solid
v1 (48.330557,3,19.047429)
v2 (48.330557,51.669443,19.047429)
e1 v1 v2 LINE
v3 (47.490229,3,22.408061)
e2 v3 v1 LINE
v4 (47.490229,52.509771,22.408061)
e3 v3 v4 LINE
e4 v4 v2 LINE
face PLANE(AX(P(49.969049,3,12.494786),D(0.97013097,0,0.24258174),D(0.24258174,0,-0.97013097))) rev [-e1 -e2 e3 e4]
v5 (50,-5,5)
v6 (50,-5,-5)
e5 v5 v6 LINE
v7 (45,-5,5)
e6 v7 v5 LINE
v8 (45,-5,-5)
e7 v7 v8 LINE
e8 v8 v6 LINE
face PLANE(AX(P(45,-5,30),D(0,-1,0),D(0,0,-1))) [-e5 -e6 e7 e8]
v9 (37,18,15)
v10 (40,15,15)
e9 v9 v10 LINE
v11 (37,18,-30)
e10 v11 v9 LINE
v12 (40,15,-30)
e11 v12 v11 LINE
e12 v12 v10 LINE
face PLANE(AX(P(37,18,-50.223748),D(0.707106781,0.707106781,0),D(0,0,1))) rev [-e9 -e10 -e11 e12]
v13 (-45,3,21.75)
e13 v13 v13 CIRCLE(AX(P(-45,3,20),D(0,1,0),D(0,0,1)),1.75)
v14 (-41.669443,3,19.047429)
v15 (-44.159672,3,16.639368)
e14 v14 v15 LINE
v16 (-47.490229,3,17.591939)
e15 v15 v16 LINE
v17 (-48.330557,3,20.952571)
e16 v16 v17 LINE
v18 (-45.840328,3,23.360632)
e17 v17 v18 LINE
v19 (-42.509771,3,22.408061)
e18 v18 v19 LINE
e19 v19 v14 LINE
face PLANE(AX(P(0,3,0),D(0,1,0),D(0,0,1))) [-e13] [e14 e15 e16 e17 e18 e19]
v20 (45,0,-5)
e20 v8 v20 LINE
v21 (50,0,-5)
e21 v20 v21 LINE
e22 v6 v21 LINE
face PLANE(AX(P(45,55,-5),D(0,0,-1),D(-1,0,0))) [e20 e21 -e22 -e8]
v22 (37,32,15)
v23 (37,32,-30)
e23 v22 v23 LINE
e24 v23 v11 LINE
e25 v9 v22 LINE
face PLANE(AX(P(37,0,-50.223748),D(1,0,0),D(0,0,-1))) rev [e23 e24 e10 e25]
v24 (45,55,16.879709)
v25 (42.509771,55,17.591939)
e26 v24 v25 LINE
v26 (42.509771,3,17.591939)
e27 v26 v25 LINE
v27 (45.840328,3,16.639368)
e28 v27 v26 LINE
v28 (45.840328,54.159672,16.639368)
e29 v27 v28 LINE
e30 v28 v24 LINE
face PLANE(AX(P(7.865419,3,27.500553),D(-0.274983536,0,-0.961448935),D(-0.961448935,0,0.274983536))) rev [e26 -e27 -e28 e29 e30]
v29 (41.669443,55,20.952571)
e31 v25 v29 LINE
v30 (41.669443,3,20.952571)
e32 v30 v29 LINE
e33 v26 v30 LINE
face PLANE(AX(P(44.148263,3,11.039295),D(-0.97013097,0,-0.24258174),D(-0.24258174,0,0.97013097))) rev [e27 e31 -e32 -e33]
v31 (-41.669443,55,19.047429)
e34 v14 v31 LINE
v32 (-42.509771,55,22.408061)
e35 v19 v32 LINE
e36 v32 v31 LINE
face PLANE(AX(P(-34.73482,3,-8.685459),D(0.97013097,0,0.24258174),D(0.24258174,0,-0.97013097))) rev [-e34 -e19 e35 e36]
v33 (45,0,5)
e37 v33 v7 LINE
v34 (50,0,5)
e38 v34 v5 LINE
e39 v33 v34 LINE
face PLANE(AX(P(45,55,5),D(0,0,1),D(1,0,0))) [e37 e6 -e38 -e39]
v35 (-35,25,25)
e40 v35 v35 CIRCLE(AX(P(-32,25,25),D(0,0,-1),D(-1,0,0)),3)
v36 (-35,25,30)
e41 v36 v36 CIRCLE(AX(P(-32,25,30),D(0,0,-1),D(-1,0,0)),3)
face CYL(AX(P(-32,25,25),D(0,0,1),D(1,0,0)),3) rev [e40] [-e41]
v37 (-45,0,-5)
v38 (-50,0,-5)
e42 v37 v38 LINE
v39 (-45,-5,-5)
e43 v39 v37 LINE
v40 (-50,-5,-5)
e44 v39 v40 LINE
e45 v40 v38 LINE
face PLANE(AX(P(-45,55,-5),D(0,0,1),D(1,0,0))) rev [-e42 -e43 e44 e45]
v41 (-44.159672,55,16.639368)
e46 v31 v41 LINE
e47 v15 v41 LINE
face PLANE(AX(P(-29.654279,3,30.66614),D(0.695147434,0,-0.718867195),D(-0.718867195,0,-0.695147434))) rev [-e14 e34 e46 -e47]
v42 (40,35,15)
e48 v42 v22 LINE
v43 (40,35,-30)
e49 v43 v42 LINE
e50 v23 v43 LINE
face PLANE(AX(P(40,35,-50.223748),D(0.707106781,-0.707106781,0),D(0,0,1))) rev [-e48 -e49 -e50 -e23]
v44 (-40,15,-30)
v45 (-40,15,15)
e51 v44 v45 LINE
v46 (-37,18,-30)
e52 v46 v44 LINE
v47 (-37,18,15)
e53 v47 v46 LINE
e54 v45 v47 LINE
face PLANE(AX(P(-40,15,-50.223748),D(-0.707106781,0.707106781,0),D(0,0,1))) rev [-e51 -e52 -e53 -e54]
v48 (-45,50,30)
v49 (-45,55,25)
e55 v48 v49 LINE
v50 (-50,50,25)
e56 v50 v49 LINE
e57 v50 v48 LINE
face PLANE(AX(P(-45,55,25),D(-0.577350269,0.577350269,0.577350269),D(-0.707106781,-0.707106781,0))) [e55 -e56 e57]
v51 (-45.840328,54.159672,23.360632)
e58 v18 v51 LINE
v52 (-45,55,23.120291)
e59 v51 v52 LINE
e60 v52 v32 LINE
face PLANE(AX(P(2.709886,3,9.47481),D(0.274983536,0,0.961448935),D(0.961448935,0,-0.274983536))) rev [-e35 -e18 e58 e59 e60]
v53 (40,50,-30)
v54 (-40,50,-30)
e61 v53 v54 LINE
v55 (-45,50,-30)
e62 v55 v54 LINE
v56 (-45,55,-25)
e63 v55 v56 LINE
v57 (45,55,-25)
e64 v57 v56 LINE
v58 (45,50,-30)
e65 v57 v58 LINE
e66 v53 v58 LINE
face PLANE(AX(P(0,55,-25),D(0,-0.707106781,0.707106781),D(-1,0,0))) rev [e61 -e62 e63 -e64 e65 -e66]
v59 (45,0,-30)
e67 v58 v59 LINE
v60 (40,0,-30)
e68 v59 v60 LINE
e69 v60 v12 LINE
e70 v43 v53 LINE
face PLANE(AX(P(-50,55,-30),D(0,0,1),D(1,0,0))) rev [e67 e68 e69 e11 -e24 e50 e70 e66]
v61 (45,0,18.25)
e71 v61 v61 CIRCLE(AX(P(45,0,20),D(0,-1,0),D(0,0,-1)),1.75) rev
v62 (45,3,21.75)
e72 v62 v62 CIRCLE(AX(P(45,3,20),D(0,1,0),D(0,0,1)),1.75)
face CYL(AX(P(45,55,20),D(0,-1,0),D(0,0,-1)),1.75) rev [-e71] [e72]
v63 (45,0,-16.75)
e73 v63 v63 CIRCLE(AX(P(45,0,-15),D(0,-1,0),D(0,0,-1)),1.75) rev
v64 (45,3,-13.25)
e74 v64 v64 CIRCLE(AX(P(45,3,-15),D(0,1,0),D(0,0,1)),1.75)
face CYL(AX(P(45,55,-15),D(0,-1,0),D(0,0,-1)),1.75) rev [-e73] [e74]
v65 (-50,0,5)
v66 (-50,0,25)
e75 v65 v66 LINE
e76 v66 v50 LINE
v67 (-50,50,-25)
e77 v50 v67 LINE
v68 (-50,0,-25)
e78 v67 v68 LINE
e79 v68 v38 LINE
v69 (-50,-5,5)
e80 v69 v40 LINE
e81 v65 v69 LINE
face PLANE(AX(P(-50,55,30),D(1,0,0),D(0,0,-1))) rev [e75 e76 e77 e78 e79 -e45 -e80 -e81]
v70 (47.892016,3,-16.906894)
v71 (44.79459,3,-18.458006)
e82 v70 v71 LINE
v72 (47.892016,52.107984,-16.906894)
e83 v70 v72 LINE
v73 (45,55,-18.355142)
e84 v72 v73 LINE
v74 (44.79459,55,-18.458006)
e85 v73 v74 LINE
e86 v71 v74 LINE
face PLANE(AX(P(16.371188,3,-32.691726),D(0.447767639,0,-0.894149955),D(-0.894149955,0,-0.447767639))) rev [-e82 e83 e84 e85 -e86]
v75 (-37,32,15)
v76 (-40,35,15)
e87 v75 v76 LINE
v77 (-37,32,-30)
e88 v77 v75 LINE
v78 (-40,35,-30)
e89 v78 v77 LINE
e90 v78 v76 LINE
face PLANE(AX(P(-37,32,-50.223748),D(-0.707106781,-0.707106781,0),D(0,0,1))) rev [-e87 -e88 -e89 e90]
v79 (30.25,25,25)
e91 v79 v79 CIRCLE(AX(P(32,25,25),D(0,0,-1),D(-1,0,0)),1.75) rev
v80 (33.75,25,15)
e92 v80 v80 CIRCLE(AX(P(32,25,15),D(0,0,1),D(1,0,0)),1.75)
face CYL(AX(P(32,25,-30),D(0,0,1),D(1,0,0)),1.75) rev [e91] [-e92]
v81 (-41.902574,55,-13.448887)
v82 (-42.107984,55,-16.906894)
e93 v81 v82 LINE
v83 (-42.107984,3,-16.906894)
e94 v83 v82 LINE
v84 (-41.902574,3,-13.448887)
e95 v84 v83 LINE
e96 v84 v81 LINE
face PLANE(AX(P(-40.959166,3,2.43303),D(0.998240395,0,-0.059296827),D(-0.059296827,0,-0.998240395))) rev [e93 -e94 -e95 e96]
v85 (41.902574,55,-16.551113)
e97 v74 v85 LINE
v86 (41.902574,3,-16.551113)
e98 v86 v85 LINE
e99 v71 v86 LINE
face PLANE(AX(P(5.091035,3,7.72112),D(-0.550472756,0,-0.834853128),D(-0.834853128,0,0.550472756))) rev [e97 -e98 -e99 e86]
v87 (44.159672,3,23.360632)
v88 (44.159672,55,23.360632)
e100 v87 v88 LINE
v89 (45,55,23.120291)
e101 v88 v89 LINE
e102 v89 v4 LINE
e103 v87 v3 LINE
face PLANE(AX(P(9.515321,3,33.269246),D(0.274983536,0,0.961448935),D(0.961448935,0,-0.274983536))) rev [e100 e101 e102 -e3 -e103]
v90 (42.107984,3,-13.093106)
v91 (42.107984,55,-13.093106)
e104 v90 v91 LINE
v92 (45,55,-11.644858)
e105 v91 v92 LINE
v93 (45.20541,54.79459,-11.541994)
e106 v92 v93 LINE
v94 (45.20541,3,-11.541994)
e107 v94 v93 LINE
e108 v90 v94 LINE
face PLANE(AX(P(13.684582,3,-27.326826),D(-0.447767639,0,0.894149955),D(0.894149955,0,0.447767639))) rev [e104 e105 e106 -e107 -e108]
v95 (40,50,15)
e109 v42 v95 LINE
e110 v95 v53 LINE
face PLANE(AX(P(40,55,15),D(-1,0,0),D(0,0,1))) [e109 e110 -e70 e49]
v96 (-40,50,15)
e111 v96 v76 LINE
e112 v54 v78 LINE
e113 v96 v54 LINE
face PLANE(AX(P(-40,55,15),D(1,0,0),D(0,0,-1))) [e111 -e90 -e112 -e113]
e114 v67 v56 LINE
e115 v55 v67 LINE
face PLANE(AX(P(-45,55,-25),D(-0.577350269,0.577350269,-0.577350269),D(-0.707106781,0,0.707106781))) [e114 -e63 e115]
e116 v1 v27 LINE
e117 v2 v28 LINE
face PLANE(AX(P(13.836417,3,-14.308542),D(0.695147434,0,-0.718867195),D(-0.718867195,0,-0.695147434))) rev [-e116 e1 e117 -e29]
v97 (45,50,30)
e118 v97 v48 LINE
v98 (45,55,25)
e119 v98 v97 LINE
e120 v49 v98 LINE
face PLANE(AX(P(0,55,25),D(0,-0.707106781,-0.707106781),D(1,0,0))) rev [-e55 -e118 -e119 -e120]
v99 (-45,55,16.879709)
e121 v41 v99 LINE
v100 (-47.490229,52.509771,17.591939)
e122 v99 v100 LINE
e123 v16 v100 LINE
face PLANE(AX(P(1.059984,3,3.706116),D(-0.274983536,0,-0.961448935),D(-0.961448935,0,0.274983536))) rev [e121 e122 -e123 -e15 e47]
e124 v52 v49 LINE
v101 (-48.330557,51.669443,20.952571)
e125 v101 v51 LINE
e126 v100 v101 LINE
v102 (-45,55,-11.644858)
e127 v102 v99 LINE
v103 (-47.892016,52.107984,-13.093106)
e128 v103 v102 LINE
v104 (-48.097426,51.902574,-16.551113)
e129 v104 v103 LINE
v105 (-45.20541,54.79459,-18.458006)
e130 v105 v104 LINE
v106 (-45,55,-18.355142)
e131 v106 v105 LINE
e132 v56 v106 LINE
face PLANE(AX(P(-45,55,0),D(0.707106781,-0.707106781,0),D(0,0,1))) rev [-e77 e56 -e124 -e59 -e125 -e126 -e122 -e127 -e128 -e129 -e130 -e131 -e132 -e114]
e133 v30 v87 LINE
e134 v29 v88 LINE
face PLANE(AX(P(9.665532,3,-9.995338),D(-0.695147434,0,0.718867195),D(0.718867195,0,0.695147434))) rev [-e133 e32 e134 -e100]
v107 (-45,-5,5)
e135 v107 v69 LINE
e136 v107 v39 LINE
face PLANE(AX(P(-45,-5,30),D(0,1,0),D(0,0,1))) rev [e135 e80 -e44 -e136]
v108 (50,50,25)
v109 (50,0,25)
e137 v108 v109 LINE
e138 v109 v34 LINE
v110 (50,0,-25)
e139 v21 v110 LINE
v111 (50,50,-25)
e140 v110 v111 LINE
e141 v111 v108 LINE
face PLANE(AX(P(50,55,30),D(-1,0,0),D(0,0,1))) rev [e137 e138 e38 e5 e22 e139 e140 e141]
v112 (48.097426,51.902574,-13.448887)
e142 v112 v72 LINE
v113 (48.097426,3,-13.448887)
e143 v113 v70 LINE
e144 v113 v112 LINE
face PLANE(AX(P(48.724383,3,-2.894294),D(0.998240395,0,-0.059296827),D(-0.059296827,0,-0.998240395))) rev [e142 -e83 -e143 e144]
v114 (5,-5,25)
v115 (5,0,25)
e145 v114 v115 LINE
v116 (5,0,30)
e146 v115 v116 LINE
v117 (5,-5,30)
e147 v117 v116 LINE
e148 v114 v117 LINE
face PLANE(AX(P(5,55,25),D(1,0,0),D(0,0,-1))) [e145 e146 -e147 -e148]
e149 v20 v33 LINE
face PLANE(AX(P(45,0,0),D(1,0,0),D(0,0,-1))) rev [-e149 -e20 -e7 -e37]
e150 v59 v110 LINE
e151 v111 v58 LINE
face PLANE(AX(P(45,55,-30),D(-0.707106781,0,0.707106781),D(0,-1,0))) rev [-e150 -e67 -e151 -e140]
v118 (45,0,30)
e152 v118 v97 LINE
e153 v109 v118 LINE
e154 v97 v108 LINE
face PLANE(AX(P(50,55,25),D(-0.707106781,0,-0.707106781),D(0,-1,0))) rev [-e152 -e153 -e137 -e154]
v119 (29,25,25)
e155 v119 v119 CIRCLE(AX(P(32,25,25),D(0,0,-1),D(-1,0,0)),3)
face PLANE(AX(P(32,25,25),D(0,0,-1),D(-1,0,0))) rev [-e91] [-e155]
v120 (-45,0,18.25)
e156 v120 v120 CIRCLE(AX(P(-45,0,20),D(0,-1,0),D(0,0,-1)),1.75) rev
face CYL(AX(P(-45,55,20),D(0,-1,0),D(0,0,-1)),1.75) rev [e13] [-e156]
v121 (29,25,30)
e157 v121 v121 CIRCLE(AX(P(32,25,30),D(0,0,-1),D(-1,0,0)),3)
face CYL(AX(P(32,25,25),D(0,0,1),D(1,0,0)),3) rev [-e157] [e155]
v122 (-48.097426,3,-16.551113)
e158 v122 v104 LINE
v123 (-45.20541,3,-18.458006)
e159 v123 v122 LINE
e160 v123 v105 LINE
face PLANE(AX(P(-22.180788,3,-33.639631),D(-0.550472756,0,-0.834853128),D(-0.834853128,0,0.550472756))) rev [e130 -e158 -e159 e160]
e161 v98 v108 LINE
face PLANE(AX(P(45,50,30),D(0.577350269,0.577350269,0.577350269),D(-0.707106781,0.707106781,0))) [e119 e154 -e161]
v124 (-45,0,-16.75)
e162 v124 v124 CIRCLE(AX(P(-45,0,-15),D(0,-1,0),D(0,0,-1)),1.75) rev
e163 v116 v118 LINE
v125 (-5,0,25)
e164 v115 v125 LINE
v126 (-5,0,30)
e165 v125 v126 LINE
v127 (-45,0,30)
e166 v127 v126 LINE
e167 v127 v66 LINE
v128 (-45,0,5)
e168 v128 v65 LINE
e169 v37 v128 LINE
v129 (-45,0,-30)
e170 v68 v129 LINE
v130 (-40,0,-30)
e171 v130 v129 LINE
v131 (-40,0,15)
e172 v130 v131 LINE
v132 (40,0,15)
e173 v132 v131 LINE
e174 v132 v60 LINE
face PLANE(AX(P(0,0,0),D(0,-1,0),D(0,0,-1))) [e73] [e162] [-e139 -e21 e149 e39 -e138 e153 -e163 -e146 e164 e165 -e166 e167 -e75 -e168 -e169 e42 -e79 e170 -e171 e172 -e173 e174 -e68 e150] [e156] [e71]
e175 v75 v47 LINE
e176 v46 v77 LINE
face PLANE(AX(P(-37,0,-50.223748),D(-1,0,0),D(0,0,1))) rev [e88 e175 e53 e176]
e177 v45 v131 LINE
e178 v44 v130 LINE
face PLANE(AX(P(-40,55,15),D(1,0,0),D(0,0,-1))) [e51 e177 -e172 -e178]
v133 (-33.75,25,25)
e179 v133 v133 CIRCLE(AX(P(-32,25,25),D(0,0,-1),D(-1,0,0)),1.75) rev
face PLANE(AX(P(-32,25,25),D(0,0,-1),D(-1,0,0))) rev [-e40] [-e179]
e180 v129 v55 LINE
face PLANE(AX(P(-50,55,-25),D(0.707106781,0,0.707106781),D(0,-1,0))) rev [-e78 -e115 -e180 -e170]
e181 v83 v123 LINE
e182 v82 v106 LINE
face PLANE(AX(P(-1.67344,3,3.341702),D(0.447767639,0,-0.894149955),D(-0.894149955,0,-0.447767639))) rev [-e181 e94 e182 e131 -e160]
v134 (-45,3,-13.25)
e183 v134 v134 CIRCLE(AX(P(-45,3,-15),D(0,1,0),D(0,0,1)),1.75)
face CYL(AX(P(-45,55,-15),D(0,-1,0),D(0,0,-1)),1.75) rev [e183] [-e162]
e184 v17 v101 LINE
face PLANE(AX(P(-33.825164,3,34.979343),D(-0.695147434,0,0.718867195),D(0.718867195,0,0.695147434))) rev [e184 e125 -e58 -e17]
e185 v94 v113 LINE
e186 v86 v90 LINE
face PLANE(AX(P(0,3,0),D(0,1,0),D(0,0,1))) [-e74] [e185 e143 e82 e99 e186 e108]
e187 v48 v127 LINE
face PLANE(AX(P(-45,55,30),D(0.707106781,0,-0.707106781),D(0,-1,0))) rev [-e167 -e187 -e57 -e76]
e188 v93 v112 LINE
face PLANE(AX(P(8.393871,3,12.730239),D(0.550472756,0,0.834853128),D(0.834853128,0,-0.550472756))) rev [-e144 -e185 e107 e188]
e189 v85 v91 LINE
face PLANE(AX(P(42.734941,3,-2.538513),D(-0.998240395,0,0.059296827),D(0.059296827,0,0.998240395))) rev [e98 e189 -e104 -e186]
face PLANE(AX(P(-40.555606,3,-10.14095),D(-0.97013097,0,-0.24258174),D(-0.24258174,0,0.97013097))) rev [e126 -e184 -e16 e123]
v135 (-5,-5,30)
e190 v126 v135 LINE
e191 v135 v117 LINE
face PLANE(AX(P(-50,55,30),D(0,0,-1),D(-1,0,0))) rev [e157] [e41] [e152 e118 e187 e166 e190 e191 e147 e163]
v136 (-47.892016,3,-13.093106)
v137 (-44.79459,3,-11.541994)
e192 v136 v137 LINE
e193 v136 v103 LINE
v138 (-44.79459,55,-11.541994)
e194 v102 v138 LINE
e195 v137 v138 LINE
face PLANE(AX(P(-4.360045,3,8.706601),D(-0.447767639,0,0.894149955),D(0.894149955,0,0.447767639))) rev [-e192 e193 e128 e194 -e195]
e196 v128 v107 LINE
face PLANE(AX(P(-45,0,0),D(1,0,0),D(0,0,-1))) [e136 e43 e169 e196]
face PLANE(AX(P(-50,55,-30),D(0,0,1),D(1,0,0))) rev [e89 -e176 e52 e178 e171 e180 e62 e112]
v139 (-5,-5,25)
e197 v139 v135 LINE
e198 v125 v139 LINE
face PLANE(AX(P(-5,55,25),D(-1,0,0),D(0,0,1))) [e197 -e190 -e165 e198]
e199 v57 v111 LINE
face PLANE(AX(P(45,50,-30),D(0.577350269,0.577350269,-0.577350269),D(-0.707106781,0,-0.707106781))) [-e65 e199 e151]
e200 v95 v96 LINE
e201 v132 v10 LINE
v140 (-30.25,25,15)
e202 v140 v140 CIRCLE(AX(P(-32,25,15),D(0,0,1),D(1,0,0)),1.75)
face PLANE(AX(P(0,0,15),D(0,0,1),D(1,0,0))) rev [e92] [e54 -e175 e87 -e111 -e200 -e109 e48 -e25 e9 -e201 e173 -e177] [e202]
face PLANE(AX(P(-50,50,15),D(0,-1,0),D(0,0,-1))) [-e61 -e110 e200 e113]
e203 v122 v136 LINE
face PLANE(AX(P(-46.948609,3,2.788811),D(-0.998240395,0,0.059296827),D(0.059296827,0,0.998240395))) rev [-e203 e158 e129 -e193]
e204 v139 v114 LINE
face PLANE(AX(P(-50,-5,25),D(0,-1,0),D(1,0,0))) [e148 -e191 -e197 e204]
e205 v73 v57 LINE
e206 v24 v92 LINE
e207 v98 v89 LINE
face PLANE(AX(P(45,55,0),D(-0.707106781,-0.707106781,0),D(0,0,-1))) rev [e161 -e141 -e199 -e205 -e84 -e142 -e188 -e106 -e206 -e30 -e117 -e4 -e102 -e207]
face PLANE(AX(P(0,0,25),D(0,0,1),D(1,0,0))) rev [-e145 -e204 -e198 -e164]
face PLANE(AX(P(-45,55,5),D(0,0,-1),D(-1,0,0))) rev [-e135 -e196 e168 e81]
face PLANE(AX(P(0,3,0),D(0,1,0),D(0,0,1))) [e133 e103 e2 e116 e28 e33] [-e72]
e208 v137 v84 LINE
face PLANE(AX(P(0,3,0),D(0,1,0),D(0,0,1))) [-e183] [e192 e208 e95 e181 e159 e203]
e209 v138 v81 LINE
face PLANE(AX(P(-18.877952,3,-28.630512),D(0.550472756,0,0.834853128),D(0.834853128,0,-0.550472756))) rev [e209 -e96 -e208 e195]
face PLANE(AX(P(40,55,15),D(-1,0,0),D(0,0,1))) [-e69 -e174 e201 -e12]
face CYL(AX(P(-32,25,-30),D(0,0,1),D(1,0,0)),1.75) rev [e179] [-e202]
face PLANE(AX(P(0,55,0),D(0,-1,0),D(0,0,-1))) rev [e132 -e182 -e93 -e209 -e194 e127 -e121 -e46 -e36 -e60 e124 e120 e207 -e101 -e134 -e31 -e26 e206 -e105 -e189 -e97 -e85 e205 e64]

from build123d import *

# Parameters (mm, degrees)
SKETCH1_W               = 100
SKETCH1_H               = 60
BOSS_EXTRUDE1_DEPTH     = 55
CUT_EXTRUDE1_START      = -30
SKETCH2_W               = 80
SKETCH2_H               = 100
CUT_EXTRUDE1_DEPTH      = 45
CUT_EXTRUDE2_DEPTH      = 81.156097709
CUT_EXTRUDE2_DEPTH_BACK = 81.156097709
SKETCH3_R               = 1.75
CUT_EXTRUDE3_START      = 55
CUT_EXTRUDE3_DEPTH      = 52
BOSS_EXTRUDE2_START     = 15
SKETCH5_W               = 3
SKETCH5_H               = 20
BOSS_EXTRUDE2_DEPTH     = 45
CHAMFER1_SIZE           = 3
CUT_EXTRUDE4_DEPTH      = 81.156097709
CUT_EXTRUDE4_DEPTH_BACK = 81.156097709
SKETCH6_R               = 1.75
CUT_EXTRUDE5_START      = 30
SKETCH7_R               = 3
CUT_EXTRUDE5_DEPTH      = 5
BOSS_EXTRUDE3_START     = 50
SKETCH8_W               = 10
SKETCH8_H               = 5
BOSS_EXTRUDE3_DEPTH     = 5
BOSS_EXTRUDE4_START     = -50
SKETCH8_2_W             = 10
SKETCH8_2_H             = 5
BOSS_EXTRUDE4_DEPTH     = 5
BOSS_EXTRUDE5_START     = 30
SKETCH9_W               = 10
SKETCH9_H               = 5
BOSS_EXTRUDE5_DEPTH     = 5


# Some blends are built 0.0001 mm under size
with BuildPart() as part:
    # Sketch1 → Boss-Extrude1 (new body)
    with BuildSketch(Plane(origin=(0, 0, 0), x_dir=(1, 0, 0), z_dir=(0, 1, 0))):
        Rectangle(SKETCH1_W, SKETCH1_H)
    extrude(amount=BOSS_EXTRUDE1_DEPTH)

    # Sketch2 → Cut-Extrude1 (cut)
    with BuildSketch(Plane.XY.offset(CUT_EXTRUDE1_START)):
        Rectangle(SKETCH2_W, SKETCH2_H)
    extrude(amount=CUT_EXTRUDE1_DEPTH, mode=Mode.SUBTRACT)

    # Sketch3 → Cut-Extrude2 (cut, two sides: drawn at the far end of the back side and taken through both)
    with BuildSketch(Plane(origin=(0, 0, 0), x_dir=(1, 0, 0), z_dir=(0, 1, 0)).offset(-CUT_EXTRUDE2_DEPTH_BACK)):
        with Locations(Location((-45, 15, 0), (0, 0, 90))):
            Circle(SKETCH3_R)
        with Locations(Location((45, 15, 0), (0, 0, 90))):
            Circle(SKETCH3_R)
        with Locations(Location((45, -20, 0), (0, 0, 90))):
            Circle(SKETCH3_R)
        with Locations(Location((-45, -20, 0), (0, 0, 90))):
            Circle(SKETCH3_R)
    extrude(amount=CUT_EXTRUDE2_DEPTH + CUT_EXTRUDE2_DEPTH_BACK, mode=Mode.SUBTRACT)

    # Sketch4 → Cut-Extrude3 (cut)
    with BuildSketch(Plane(origin=(0, 0, 0), x_dir=(1, 0, 0), z_dir=(0, 1, 0)).offset(CUT_EXTRUDE3_START)):
        Polygon((44.159672203, -23.360632261), (47.490229012, -22.408061351), (48.330556809, -19.04742909), (45.840327797, -16.639367739), (42.509770988, -17.591938649), (41.669443191, -20.95257091), align=None)
        Polygon((44.794589767, 18.458006165), (41.902573698, 16.551112602), (42.107983932, 13.093106437), (45.205410233, 11.541993835), (48.097426302, 13.448887398), (47.892016068, 16.906893563), align=None)
        Polygon((-45.840327797, -23.360632261), (-42.509770988, -22.408061351), (-41.669443191, -19.04742909), (-44.159672203, -16.639367739), (-47.490229012, -17.591938649), (-48.330556809, -20.95257091), align=None)
        Polygon((-45.205410233, 18.458006165), (-48.097426302, 16.551112602), (-47.892016068, 13.093106437), (-44.794589767, 11.541993835), (-41.902573698, 13.448887398), (-42.107983932, 16.906893563), align=None)
    extrude(amount=-CUT_EXTRUDE3_DEPTH, mode=Mode.SUBTRACT)

    # Sketch5 → Boss-Extrude2 (add)
    with BuildSketch(Plane.XY.offset(BOSS_EXTRUDE2_START)):
        with Locations((-38.5, 25)):
            Rectangle(SKETCH5_W, SKETCH5_H)
        with Locations((38.5, 25)):
            Rectangle(SKETCH5_W, SKETCH5_H)
    extrude(amount=-BOSS_EXTRUDE2_DEPTH)

    # Chamfer1
    chamfer1_edges = [part.edges().sort_by_distance(p)[0] for p in [
        (37, 15, -7.5),
        (37, 35, -7.5),
        (-37, 15, -7.5),
        (-37, 35, -7.5),
    ]]
    chamfer(chamfer1_edges, length=CHAMFER1_SIZE - 0.0001)  # a hair under: the kernel refuses the full size

    # Sketch6 → Cut-Extrude4 (cut, two sides: drawn at the far end of the back side and taken through both)
    with BuildSketch(Plane.XY.offset(-CUT_EXTRUDE4_DEPTH_BACK)):
        with Locations((32, 25)):
            Circle(SKETCH6_R)
        with Locations((-32, 25)):
            Circle(SKETCH6_R)
    extrude(amount=CUT_EXTRUDE4_DEPTH + CUT_EXTRUDE4_DEPTH_BACK, mode=Mode.SUBTRACT)

    # Sketch7 → Cut-Extrude5 (cut)
    with BuildSketch(Plane.XY.offset(CUT_EXTRUDE5_START)):
        with Locations(Location((-32, 25, 0), (0, 0, 180))):
            Circle(SKETCH7_R)
        with Locations(Location((32, 25, 0), (0, 0, 180))):
            Circle(SKETCH7_R)
    extrude(amount=-CUT_EXTRUDE5_DEPTH, mode=Mode.SUBTRACT)

    # Sketch8 → Boss-Extrude3 (add)
    with BuildSketch(Plane(origin=(0, 0, 0), x_dir=(0, 0, -1), z_dir=(1, 0, 0)).offset(BOSS_EXTRUDE3_START)):
        with Locations((0, -2.5)):
            Rectangle(SKETCH8_W, SKETCH8_H)
    extrude(amount=-BOSS_EXTRUDE3_DEPTH)

    # Sketch8<2> → Boss-Extrude4 (add)
    with BuildSketch(Plane(origin=(0, 0, 0), x_dir=(0, 0, -1), z_dir=(1, 0, 0)).offset(BOSS_EXTRUDE4_START)):
        with Locations((0, -2.5)):
            Rectangle(SKETCH8_2_W, SKETCH8_2_H)
    extrude(amount=BOSS_EXTRUDE4_DEPTH)

    # Sketch9 → Boss-Extrude5 (add)
    with BuildSketch(Plane.XY.offset(BOSS_EXTRUDE5_START)):
        with Locations((0, -2.5)):
            Rectangle(SKETCH9_W, SKETCH9_H)
    extrude(amount=-BOSS_EXTRUDE5_DEPTH)

    # Chamfer2
    # the kernel refuses this chamfer: 5 mm, written as the material it takes off along each edge
    with BuildSketch(Plane(origin=(-46.666666667, 51.666666667, -26.666666667), x_dir=(0, 0.7071067811865475, 0.7071067811865475), z_dir=(-0.5773502691896257, 0.5773502691896257, -0.5773502691896257)), Plane(origin=(46.666666667, 51.666666667, 26.666666667), x_dir=(0, 0.7071067811865475, -0.7071067811865475), z_dir=(0.5773502691896257, 0.5773502691896257, 0.5773502691896257))) as chamfer2_piece_1:
        Polygon((-3.535533906, 2.041241452), (3.535533906, 2.041241452), (0, -4.082482905), align=None)
    extrude(amount=6.350852961, mode=Mode.SUBTRACT)
    with BuildSketch(Plane(origin=(46.666666667, 51.666666667, -26.666666667), x_dir=(0, 0.7071067811865475, 0.7071067811865475), z_dir=(0.577350269189626, 0.5773502691896256, -0.5773502691896256)), Plane(origin=(-46.666666667, 51.666666667, 26.666666667), x_dir=(0, 0.7071067811865475, -0.7071067811865475), z_dir=(-0.577350269189626, 0.5773502691896256, 0.5773502691896256))) as chamfer2_piece_2:
        Polygon((-3.535533906, -2.041241452), (3.535533906, -2.041241452), (0, 4.082482905), align=None)
    extrude(amount=6.350852961, mode=Mode.SUBTRACT)
    with BuildSketch(Plane(origin=(-50, -12.85841494, -30), x_dir=(0.9996219169112968, 0, -0.027495876610586317), z_dir=(0, 1, 0)), Plane(origin=(-50, -12.85841494, 30), x_dir=(-0.027495876610586317, 0, -0.9996219169112968), z_dir=(0, 1, 0))) as chamfer2_piece_3:
        with BuildLine():
            Line((5.143365976, 0), (-0.282735774, -5.135588968))
            Line((-0.282735774, -5.135588968), (-0.382697966, -5.13283938))
            ThreePointArc((-0.382697966, -5.13283938), (-0.170646135, -2.566989148), (-0.099962192, 0.002749588))
            Line((-0.099962192, 0.002749588), (0.002749588, 0.099962192))
            ThreePointArc((0.002749588, 0.099962192), (2.572488324, 0.029278248), (5.146115564, 0.099962192))
            Line((5.146115564, 0.099962192), (5.143365976, 0))
        make_face()
    extrude(amount=80.71682988, mode=Mode.SUBTRACT)
    with BuildSketch(Plane(origin=(50, -12.85841494, -30), x_dir=(-0.9996219169112968, 0, -0.027495876610586317), z_dir=(0, 1, 0)), Plane(origin=(50, -12.85841494, 30), x_dir=(0.027495876610586317, 0, -0.9996219169112968), z_dir=(0, 1, 0))) as chamfer2_piece_4:
        with BuildLine():
            Line((5.143365976, 0), (-0.282735774, 5.135588968))
            Line((-0.282735774, 5.135588968), (-0.382697966, 5.13283938))
            ThreePointArc((-0.382697966, 5.13283938), (-0.170646135, 2.566989148), (-0.099962192, -0.002749588))
            Line((-0.099962192, -0.002749588), (0.002749588, -0.099962192))
            ThreePointArc((0.002749588, -0.099962192), (2.572488324, -0.029278248), (5.146115564, -0.099962192))
            Line((5.146115564, -0.099962192), (5.143365976, 0))
        make_face()
    extrude(amount=80.71682988, mode=Mode.SUBTRACT)
    with BuildSketch(Plane(origin=(50, 55, 42.85841494), x_dir=(-0.9996219169112968, 0.027495876610586317, 0), z_dir=(0, 0, -1))) as chamfer2_piece_5:
        with BuildLine():
            Line((5.143365976, 0), (-0.282735774, -5.135588968))
            Line((-0.282735774, -5.135588968), (-0.382697966, -5.13283938))
            ThreePointArc((-0.382697966, -5.13283938), (-0.170646135, -2.566989148), (-0.099962192, 0.002749588))
            Line((-0.099962192, 0.002749588), (0.002749588, 0.099962192))
            ThreePointArc((0.002749588, 0.099962192), (2.572488324, 0.029278248), (5.146115564, 0.099962192))
            Line((5.146115564, 0.099962192), (5.143365976, 0))
        make_face()
    extrude(amount=85.71682988, mode=Mode.SUBTRACT)
    with BuildSketch(Plane(origin=(-50, 55, -42.85841494), x_dir=(-0.027495876610586317, -0.9996219169112968, 0), z_dir=(0, 0, 1))) as chamfer2_piece_6:
        with BuildLine():
            Line((5.143365976, 0), (-0.282735774, 5.135588968))
            Line((-0.282735774, 5.135588968), (-0.382697966, 5.13283938))
            ThreePointArc((-0.382697966, 5.13283938), (-0.170646135, 2.566989148), (-0.099962192, -0.002749588))
            Line((-0.099962192, -0.002749588), (0.002749588, -0.099962192))
            ThreePointArc((0.002749588, -0.099962192), (2.572488324, -0.029278248), (5.146115564, -0.099962192))
            Line((5.146115564, -0.099962192), (5.143365976, 0))
        make_face()
    extrude(amount=85.71682988, mode=Mode.SUBTRACT)
    with BuildSketch(Plane(origin=(-62.85841494, 55, 30), x_dir=(0, 0.027495876610586317, -0.9996219169112968), z_dir=(1, 0, 0))) as chamfer2_piece_7:
        with BuildLine():
            Line((5.143365976, 0), (-0.282735774, -5.135588968))
            Line((-0.282735774, -5.135588968), (-0.382697966, -5.13283938))
            ThreePointArc((-0.382697966, -5.13283938), (-0.170646135, -2.566989148), (-0.099962192, 0.002749588))
            Line((-0.099962192, 0.002749588), (0.002749588, 0.099962192))
            ThreePointArc((0.002749588, 0.099962192), (2.572488324, 0.029278248), (5.146115564, 0.099962192))
            Line((5.146115564, 0.099962192), (5.143365976, 0))
        make_face()
    extrude(amount=125.71682988, mode=Mode.SUBTRACT)
    with BuildSketch(Plane(origin=(62.85841494, 55, -30), x_dir=(0, -0.9996219169112968, -0.027495876610586317), z_dir=(-1, 0, 0))) as chamfer2_piece_8:
        with BuildLine():
            Line((5.143365976, 0), (-0.282735774, 5.135588968))
            Line((-0.282735774, 5.135588968), (-0.382697966, 5.13283938))
            ThreePointArc((-0.382697966, 5.13283938), (-0.170646135, 2.566989148), (-0.099962192, -0.002749588))
            Line((-0.099962192, -0.002749588), (0.002749588, -0.099962192))
            ThreePointArc((0.002749588, -0.099962192), (2.572488324, -0.029278248), (5.146115564, -0.099962192))
            Line((5.146115564, -0.099962192), (5.143365976, 0))
        make_face()
    extrude(amount=125.71682988, mode=Mode.SUBTRACT)


solid = part.part
